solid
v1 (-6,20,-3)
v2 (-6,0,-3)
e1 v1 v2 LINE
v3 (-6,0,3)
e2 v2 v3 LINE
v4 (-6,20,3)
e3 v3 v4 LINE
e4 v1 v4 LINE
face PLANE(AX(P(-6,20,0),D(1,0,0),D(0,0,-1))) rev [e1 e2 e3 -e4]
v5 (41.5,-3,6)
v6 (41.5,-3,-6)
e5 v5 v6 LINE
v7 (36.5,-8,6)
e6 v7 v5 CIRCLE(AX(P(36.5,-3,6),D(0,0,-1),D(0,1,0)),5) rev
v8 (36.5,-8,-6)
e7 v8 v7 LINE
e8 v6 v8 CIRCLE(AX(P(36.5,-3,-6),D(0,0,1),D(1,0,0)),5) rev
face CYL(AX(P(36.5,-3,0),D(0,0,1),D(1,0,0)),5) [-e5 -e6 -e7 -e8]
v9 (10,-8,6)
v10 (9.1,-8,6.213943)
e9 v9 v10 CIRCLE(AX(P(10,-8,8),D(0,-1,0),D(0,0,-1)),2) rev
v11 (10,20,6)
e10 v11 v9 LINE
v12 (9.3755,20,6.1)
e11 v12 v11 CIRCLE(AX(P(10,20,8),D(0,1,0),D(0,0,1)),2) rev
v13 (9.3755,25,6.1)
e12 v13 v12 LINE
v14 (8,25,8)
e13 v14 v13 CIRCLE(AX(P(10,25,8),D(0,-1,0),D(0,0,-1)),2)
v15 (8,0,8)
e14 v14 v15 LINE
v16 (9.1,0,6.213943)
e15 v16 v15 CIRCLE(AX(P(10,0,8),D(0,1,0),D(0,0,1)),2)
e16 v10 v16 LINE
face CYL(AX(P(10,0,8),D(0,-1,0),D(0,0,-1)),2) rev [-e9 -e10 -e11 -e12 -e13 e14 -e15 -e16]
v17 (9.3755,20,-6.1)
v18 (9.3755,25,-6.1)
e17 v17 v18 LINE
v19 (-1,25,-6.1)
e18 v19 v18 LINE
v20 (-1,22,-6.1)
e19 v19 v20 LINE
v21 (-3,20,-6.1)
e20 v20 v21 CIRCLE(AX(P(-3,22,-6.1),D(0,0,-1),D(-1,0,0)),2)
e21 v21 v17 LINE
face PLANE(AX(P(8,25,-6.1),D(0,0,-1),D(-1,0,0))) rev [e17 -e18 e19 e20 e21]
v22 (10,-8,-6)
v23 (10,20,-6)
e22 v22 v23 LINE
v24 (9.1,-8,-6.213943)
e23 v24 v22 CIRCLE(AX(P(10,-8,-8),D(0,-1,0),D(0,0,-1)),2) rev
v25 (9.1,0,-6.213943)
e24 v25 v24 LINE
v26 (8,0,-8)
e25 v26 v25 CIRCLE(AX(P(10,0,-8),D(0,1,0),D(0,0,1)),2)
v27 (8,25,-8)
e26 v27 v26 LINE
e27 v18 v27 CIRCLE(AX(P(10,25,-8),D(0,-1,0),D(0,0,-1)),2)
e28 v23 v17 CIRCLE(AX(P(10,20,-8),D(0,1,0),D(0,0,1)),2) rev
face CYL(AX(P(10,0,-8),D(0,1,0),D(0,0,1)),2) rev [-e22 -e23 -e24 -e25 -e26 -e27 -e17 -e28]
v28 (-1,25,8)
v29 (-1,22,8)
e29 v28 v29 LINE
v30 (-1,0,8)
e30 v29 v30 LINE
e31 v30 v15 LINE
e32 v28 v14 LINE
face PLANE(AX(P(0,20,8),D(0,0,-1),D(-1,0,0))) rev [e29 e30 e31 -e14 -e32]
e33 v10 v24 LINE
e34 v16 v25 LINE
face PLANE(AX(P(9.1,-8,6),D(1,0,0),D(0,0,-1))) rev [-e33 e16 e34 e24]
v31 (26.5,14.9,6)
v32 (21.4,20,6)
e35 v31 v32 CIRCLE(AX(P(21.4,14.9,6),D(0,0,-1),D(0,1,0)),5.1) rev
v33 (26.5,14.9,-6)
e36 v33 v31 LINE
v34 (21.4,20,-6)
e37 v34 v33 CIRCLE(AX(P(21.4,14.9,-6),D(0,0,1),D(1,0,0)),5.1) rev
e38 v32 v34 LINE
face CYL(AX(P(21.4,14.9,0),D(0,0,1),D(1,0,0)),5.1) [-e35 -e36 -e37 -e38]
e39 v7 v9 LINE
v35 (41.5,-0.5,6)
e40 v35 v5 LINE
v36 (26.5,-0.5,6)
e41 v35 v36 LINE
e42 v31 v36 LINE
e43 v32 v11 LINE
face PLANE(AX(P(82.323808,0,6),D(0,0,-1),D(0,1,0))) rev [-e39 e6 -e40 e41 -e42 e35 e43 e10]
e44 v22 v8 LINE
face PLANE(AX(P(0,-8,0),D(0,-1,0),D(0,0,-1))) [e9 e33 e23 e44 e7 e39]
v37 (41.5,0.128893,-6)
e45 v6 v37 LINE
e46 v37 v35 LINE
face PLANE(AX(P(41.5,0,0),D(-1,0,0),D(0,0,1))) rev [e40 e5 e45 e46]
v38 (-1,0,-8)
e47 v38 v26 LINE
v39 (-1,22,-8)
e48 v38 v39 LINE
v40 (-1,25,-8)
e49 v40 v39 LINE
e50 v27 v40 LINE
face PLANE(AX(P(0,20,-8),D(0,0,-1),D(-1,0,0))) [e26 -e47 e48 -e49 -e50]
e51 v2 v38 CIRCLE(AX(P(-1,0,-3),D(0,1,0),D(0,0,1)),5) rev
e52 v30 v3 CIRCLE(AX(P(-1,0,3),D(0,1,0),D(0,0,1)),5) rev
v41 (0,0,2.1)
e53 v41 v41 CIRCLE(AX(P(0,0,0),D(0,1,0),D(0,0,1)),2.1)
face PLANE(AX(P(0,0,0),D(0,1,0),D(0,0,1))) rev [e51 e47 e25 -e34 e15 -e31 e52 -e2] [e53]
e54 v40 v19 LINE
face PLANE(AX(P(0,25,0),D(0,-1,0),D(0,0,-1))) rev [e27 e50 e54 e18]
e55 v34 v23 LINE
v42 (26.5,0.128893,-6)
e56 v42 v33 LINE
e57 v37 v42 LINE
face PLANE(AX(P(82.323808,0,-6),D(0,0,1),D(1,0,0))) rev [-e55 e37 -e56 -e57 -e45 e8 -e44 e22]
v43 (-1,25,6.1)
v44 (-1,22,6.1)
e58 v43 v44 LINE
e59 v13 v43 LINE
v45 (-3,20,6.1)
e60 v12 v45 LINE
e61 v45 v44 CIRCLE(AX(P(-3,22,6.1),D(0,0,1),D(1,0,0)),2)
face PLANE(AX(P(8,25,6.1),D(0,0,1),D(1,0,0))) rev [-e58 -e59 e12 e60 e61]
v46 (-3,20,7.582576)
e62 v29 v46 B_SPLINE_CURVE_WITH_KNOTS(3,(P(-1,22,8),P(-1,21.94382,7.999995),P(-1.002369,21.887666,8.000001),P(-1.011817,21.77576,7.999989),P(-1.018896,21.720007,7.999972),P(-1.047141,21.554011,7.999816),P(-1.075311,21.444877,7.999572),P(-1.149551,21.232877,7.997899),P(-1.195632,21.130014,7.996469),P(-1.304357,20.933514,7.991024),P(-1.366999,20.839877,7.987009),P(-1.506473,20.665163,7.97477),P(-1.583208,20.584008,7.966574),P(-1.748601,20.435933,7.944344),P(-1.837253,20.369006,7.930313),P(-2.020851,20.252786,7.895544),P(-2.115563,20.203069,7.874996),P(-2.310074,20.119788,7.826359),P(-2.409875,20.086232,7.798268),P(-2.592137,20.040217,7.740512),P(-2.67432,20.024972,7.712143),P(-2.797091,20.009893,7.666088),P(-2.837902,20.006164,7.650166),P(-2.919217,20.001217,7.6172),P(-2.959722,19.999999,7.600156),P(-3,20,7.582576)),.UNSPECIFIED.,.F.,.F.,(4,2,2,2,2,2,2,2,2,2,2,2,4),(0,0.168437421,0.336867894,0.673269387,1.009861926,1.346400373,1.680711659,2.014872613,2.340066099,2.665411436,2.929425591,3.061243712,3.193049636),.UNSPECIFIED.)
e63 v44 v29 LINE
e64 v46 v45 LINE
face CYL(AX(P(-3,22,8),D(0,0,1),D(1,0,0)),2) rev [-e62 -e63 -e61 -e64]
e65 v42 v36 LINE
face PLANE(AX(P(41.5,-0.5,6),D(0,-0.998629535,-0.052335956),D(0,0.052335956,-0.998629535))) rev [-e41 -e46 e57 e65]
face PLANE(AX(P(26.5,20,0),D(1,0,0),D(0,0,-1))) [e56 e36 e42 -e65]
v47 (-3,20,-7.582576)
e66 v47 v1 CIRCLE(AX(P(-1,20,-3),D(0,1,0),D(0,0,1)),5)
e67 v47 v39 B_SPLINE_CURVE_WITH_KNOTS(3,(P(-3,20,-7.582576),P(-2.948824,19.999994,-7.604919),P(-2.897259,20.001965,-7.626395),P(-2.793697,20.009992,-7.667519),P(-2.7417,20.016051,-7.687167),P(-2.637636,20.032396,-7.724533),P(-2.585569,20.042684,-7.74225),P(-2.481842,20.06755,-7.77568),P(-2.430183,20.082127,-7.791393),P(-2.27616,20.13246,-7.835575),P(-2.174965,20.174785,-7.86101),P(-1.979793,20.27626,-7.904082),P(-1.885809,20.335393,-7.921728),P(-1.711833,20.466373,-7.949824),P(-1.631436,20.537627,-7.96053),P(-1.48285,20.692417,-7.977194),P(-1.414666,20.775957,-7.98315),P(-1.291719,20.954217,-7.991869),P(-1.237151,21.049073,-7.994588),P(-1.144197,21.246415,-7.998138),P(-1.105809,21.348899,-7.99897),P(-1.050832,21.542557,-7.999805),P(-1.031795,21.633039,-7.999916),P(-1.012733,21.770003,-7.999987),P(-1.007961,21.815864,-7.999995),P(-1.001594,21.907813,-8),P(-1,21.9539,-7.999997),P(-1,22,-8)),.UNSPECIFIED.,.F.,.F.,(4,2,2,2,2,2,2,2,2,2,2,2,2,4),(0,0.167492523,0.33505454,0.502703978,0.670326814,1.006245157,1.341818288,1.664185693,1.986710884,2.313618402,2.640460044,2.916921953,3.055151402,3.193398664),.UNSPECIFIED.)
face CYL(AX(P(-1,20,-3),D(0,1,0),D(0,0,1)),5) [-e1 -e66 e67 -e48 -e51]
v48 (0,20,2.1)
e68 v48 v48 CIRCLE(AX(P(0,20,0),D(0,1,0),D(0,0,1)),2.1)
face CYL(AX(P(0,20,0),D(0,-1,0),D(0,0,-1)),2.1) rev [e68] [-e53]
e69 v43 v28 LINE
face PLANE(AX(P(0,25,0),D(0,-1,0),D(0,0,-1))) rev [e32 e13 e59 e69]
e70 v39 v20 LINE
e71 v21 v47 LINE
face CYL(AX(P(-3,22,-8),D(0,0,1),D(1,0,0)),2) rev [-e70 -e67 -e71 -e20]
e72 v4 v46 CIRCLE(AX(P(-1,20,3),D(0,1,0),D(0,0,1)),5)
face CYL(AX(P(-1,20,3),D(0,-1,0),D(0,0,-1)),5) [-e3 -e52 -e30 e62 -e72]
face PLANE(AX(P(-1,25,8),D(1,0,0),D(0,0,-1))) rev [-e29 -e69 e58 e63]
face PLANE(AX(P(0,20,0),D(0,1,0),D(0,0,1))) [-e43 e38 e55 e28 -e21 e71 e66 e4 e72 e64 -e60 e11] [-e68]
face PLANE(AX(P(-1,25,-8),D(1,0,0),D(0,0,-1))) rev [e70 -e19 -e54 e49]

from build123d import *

# Parameters (mm, degrees)
SKETCH1_W           = 12
SKETCH1_H           = 16
SKETCH1_R           = 2.1
SKETCH1_W_2         = 2
BOSS_EXTRUDE1_DEPTH = 20
FILLET1_R           = 5
SKETCH2_W           = 9
SKETCH2_H           = 1.9
BOSS_EXTRUDE2_DEPTH = 5
SKETCH4_W           = 12
SKETCH4_H           = 20
BOSS_EXTRUDE3_DEPTH = 18.5
FILLET2_R           = 5.1
SKETCH5_W           = 17.4
SKETCH5_H           = 12
BOSS_EXTRUDE4_DEPTH = 8
BOSS_EXTRUDE5_DEPTH = 15
FILLET4_R           = 5
FILLET5_R           = 2


with BuildPart() as part:
    # Sketch1 → Boss-Extrude1 (new body)
    # profile 1 of 2: a face of its own
    with BuildSketch(Plane(origin=(0, 0, 0), x_dir=(1, 0, 0), z_dir=(0, 1, 0))):
        Rectangle(SKETCH1_W, SKETCH1_H)
        with Locations(Location((0, 0, 0), (0, 0, 270))):
            Circle(SKETCH1_R, mode=Mode.SUBTRACT)
    # profile 2 of 2: a face of its own
    with BuildSketch(Plane(origin=(0, 0, 0), x_dir=(1, 0, 0), z_dir=(0, 1, 0))):
        with Locations((7, 0)):
            Rectangle(SKETCH1_W_2, SKETCH1_H)
    extrude(amount=BOSS_EXTRUDE1_DEPTH)

    # Fillet1
    fillet1_edges = [part.edges().sort_by_distance(p)[0] for p in [
        (-6, 10, 8),
        (-6, 10, -8),
    ]]
    fillet(fillet1_edges, radius=FILLET1_R)

    # Sketch2 → Boss-Extrude2 (add)
    with BuildSketch(Plane(origin=(0, 20, 0), x_dir=(1, 0, 0), z_dir=(0, 1, 0))):
        with Locations((3.5, 7.05)):
            Rectangle(SKETCH2_W, SKETCH2_H)
        with Locations((3.5, -7.05)):
            Rectangle(SKETCH2_W, SKETCH2_H)
    extrude(amount=BOSS_EXTRUDE2_DEPTH)

    # Sketch4 → Boss-Extrude3 (add)
    with BuildSketch(Plane(origin=(8, 0, 0), x_dir=(0, 0, -1), z_dir=(1, 0, 0))):
        with Locations((0, 10)):
            Rectangle(SKETCH4_W, SKETCH4_H)
    extrude(amount=BOSS_EXTRUDE3_DEPTH)

    # Fillet2
    fillet2_edges = [part.edges().sort_by_distance(p)[0] for p in [
        (26.5, 20, 0),
    ]]
    fillet(fillet2_edges, radius=FILLET2_R)

    # Sketch5 → Boss-Extrude4 (add)
    with BuildSketch(Plane.XZ):
        with Locations((17.8, 0)):
            Rectangle(SKETCH5_W, SKETCH5_H)
    extrude(amount=BOSS_EXTRUDE4_DEPTH)

    # Sketch8 → Boss-Extrude5 (add)
    with BuildSketch(Plane(origin=(26.5, 0, 0), x_dir=(0, 0, -1), z_dir=(1, 0, 0))):
        Polygon((-6, -8), (-6, -0.5), (6, 0.128893351), (6, -8), align=None)
    extrude(amount=BOSS_EXTRUDE5_DEPTH)

    # Fillet4
    fillet4_edges = [part.edges().sort_by_distance(p)[0] for p in [
        (41.5, -8, 0),
    ]]
    fillet(fillet4_edges, radius=FILLET4_R)

    # Fillet5
    fillet5_edges = [part.edges().sort_by_distance(p)[0] for p in [
        (8, 10, 6),
    ]]
    fillet(fillet5_edges, radius=FILLET5_R - 0.0001)  # a hair under: the kernel refuses the full size
    fillet5_2_edges = [part.edges().sort_by_distance(p)[0] for p in [
        (8, 10, -6),
    ]]
    fillet(fillet5_2_edges, radius=FILLET5_R - 0.0001)  # a hair under: the kernel refuses the full size
    fillet5_3_edges = [part.edges().sort_by_distance(p)[0] for p in [
        (-1, 20, -7.05),
    ]]
    fillet(fillet5_3_edges, radius=FILLET5_R)
    fillet5_4_edges = [part.edges().sort_by_distance(p)[0] for p in [
        (-1, 20, 7.05),
    ]]
    fillet(fillet5_4_edges, radius=FILLET5_R)


solid = part.part
